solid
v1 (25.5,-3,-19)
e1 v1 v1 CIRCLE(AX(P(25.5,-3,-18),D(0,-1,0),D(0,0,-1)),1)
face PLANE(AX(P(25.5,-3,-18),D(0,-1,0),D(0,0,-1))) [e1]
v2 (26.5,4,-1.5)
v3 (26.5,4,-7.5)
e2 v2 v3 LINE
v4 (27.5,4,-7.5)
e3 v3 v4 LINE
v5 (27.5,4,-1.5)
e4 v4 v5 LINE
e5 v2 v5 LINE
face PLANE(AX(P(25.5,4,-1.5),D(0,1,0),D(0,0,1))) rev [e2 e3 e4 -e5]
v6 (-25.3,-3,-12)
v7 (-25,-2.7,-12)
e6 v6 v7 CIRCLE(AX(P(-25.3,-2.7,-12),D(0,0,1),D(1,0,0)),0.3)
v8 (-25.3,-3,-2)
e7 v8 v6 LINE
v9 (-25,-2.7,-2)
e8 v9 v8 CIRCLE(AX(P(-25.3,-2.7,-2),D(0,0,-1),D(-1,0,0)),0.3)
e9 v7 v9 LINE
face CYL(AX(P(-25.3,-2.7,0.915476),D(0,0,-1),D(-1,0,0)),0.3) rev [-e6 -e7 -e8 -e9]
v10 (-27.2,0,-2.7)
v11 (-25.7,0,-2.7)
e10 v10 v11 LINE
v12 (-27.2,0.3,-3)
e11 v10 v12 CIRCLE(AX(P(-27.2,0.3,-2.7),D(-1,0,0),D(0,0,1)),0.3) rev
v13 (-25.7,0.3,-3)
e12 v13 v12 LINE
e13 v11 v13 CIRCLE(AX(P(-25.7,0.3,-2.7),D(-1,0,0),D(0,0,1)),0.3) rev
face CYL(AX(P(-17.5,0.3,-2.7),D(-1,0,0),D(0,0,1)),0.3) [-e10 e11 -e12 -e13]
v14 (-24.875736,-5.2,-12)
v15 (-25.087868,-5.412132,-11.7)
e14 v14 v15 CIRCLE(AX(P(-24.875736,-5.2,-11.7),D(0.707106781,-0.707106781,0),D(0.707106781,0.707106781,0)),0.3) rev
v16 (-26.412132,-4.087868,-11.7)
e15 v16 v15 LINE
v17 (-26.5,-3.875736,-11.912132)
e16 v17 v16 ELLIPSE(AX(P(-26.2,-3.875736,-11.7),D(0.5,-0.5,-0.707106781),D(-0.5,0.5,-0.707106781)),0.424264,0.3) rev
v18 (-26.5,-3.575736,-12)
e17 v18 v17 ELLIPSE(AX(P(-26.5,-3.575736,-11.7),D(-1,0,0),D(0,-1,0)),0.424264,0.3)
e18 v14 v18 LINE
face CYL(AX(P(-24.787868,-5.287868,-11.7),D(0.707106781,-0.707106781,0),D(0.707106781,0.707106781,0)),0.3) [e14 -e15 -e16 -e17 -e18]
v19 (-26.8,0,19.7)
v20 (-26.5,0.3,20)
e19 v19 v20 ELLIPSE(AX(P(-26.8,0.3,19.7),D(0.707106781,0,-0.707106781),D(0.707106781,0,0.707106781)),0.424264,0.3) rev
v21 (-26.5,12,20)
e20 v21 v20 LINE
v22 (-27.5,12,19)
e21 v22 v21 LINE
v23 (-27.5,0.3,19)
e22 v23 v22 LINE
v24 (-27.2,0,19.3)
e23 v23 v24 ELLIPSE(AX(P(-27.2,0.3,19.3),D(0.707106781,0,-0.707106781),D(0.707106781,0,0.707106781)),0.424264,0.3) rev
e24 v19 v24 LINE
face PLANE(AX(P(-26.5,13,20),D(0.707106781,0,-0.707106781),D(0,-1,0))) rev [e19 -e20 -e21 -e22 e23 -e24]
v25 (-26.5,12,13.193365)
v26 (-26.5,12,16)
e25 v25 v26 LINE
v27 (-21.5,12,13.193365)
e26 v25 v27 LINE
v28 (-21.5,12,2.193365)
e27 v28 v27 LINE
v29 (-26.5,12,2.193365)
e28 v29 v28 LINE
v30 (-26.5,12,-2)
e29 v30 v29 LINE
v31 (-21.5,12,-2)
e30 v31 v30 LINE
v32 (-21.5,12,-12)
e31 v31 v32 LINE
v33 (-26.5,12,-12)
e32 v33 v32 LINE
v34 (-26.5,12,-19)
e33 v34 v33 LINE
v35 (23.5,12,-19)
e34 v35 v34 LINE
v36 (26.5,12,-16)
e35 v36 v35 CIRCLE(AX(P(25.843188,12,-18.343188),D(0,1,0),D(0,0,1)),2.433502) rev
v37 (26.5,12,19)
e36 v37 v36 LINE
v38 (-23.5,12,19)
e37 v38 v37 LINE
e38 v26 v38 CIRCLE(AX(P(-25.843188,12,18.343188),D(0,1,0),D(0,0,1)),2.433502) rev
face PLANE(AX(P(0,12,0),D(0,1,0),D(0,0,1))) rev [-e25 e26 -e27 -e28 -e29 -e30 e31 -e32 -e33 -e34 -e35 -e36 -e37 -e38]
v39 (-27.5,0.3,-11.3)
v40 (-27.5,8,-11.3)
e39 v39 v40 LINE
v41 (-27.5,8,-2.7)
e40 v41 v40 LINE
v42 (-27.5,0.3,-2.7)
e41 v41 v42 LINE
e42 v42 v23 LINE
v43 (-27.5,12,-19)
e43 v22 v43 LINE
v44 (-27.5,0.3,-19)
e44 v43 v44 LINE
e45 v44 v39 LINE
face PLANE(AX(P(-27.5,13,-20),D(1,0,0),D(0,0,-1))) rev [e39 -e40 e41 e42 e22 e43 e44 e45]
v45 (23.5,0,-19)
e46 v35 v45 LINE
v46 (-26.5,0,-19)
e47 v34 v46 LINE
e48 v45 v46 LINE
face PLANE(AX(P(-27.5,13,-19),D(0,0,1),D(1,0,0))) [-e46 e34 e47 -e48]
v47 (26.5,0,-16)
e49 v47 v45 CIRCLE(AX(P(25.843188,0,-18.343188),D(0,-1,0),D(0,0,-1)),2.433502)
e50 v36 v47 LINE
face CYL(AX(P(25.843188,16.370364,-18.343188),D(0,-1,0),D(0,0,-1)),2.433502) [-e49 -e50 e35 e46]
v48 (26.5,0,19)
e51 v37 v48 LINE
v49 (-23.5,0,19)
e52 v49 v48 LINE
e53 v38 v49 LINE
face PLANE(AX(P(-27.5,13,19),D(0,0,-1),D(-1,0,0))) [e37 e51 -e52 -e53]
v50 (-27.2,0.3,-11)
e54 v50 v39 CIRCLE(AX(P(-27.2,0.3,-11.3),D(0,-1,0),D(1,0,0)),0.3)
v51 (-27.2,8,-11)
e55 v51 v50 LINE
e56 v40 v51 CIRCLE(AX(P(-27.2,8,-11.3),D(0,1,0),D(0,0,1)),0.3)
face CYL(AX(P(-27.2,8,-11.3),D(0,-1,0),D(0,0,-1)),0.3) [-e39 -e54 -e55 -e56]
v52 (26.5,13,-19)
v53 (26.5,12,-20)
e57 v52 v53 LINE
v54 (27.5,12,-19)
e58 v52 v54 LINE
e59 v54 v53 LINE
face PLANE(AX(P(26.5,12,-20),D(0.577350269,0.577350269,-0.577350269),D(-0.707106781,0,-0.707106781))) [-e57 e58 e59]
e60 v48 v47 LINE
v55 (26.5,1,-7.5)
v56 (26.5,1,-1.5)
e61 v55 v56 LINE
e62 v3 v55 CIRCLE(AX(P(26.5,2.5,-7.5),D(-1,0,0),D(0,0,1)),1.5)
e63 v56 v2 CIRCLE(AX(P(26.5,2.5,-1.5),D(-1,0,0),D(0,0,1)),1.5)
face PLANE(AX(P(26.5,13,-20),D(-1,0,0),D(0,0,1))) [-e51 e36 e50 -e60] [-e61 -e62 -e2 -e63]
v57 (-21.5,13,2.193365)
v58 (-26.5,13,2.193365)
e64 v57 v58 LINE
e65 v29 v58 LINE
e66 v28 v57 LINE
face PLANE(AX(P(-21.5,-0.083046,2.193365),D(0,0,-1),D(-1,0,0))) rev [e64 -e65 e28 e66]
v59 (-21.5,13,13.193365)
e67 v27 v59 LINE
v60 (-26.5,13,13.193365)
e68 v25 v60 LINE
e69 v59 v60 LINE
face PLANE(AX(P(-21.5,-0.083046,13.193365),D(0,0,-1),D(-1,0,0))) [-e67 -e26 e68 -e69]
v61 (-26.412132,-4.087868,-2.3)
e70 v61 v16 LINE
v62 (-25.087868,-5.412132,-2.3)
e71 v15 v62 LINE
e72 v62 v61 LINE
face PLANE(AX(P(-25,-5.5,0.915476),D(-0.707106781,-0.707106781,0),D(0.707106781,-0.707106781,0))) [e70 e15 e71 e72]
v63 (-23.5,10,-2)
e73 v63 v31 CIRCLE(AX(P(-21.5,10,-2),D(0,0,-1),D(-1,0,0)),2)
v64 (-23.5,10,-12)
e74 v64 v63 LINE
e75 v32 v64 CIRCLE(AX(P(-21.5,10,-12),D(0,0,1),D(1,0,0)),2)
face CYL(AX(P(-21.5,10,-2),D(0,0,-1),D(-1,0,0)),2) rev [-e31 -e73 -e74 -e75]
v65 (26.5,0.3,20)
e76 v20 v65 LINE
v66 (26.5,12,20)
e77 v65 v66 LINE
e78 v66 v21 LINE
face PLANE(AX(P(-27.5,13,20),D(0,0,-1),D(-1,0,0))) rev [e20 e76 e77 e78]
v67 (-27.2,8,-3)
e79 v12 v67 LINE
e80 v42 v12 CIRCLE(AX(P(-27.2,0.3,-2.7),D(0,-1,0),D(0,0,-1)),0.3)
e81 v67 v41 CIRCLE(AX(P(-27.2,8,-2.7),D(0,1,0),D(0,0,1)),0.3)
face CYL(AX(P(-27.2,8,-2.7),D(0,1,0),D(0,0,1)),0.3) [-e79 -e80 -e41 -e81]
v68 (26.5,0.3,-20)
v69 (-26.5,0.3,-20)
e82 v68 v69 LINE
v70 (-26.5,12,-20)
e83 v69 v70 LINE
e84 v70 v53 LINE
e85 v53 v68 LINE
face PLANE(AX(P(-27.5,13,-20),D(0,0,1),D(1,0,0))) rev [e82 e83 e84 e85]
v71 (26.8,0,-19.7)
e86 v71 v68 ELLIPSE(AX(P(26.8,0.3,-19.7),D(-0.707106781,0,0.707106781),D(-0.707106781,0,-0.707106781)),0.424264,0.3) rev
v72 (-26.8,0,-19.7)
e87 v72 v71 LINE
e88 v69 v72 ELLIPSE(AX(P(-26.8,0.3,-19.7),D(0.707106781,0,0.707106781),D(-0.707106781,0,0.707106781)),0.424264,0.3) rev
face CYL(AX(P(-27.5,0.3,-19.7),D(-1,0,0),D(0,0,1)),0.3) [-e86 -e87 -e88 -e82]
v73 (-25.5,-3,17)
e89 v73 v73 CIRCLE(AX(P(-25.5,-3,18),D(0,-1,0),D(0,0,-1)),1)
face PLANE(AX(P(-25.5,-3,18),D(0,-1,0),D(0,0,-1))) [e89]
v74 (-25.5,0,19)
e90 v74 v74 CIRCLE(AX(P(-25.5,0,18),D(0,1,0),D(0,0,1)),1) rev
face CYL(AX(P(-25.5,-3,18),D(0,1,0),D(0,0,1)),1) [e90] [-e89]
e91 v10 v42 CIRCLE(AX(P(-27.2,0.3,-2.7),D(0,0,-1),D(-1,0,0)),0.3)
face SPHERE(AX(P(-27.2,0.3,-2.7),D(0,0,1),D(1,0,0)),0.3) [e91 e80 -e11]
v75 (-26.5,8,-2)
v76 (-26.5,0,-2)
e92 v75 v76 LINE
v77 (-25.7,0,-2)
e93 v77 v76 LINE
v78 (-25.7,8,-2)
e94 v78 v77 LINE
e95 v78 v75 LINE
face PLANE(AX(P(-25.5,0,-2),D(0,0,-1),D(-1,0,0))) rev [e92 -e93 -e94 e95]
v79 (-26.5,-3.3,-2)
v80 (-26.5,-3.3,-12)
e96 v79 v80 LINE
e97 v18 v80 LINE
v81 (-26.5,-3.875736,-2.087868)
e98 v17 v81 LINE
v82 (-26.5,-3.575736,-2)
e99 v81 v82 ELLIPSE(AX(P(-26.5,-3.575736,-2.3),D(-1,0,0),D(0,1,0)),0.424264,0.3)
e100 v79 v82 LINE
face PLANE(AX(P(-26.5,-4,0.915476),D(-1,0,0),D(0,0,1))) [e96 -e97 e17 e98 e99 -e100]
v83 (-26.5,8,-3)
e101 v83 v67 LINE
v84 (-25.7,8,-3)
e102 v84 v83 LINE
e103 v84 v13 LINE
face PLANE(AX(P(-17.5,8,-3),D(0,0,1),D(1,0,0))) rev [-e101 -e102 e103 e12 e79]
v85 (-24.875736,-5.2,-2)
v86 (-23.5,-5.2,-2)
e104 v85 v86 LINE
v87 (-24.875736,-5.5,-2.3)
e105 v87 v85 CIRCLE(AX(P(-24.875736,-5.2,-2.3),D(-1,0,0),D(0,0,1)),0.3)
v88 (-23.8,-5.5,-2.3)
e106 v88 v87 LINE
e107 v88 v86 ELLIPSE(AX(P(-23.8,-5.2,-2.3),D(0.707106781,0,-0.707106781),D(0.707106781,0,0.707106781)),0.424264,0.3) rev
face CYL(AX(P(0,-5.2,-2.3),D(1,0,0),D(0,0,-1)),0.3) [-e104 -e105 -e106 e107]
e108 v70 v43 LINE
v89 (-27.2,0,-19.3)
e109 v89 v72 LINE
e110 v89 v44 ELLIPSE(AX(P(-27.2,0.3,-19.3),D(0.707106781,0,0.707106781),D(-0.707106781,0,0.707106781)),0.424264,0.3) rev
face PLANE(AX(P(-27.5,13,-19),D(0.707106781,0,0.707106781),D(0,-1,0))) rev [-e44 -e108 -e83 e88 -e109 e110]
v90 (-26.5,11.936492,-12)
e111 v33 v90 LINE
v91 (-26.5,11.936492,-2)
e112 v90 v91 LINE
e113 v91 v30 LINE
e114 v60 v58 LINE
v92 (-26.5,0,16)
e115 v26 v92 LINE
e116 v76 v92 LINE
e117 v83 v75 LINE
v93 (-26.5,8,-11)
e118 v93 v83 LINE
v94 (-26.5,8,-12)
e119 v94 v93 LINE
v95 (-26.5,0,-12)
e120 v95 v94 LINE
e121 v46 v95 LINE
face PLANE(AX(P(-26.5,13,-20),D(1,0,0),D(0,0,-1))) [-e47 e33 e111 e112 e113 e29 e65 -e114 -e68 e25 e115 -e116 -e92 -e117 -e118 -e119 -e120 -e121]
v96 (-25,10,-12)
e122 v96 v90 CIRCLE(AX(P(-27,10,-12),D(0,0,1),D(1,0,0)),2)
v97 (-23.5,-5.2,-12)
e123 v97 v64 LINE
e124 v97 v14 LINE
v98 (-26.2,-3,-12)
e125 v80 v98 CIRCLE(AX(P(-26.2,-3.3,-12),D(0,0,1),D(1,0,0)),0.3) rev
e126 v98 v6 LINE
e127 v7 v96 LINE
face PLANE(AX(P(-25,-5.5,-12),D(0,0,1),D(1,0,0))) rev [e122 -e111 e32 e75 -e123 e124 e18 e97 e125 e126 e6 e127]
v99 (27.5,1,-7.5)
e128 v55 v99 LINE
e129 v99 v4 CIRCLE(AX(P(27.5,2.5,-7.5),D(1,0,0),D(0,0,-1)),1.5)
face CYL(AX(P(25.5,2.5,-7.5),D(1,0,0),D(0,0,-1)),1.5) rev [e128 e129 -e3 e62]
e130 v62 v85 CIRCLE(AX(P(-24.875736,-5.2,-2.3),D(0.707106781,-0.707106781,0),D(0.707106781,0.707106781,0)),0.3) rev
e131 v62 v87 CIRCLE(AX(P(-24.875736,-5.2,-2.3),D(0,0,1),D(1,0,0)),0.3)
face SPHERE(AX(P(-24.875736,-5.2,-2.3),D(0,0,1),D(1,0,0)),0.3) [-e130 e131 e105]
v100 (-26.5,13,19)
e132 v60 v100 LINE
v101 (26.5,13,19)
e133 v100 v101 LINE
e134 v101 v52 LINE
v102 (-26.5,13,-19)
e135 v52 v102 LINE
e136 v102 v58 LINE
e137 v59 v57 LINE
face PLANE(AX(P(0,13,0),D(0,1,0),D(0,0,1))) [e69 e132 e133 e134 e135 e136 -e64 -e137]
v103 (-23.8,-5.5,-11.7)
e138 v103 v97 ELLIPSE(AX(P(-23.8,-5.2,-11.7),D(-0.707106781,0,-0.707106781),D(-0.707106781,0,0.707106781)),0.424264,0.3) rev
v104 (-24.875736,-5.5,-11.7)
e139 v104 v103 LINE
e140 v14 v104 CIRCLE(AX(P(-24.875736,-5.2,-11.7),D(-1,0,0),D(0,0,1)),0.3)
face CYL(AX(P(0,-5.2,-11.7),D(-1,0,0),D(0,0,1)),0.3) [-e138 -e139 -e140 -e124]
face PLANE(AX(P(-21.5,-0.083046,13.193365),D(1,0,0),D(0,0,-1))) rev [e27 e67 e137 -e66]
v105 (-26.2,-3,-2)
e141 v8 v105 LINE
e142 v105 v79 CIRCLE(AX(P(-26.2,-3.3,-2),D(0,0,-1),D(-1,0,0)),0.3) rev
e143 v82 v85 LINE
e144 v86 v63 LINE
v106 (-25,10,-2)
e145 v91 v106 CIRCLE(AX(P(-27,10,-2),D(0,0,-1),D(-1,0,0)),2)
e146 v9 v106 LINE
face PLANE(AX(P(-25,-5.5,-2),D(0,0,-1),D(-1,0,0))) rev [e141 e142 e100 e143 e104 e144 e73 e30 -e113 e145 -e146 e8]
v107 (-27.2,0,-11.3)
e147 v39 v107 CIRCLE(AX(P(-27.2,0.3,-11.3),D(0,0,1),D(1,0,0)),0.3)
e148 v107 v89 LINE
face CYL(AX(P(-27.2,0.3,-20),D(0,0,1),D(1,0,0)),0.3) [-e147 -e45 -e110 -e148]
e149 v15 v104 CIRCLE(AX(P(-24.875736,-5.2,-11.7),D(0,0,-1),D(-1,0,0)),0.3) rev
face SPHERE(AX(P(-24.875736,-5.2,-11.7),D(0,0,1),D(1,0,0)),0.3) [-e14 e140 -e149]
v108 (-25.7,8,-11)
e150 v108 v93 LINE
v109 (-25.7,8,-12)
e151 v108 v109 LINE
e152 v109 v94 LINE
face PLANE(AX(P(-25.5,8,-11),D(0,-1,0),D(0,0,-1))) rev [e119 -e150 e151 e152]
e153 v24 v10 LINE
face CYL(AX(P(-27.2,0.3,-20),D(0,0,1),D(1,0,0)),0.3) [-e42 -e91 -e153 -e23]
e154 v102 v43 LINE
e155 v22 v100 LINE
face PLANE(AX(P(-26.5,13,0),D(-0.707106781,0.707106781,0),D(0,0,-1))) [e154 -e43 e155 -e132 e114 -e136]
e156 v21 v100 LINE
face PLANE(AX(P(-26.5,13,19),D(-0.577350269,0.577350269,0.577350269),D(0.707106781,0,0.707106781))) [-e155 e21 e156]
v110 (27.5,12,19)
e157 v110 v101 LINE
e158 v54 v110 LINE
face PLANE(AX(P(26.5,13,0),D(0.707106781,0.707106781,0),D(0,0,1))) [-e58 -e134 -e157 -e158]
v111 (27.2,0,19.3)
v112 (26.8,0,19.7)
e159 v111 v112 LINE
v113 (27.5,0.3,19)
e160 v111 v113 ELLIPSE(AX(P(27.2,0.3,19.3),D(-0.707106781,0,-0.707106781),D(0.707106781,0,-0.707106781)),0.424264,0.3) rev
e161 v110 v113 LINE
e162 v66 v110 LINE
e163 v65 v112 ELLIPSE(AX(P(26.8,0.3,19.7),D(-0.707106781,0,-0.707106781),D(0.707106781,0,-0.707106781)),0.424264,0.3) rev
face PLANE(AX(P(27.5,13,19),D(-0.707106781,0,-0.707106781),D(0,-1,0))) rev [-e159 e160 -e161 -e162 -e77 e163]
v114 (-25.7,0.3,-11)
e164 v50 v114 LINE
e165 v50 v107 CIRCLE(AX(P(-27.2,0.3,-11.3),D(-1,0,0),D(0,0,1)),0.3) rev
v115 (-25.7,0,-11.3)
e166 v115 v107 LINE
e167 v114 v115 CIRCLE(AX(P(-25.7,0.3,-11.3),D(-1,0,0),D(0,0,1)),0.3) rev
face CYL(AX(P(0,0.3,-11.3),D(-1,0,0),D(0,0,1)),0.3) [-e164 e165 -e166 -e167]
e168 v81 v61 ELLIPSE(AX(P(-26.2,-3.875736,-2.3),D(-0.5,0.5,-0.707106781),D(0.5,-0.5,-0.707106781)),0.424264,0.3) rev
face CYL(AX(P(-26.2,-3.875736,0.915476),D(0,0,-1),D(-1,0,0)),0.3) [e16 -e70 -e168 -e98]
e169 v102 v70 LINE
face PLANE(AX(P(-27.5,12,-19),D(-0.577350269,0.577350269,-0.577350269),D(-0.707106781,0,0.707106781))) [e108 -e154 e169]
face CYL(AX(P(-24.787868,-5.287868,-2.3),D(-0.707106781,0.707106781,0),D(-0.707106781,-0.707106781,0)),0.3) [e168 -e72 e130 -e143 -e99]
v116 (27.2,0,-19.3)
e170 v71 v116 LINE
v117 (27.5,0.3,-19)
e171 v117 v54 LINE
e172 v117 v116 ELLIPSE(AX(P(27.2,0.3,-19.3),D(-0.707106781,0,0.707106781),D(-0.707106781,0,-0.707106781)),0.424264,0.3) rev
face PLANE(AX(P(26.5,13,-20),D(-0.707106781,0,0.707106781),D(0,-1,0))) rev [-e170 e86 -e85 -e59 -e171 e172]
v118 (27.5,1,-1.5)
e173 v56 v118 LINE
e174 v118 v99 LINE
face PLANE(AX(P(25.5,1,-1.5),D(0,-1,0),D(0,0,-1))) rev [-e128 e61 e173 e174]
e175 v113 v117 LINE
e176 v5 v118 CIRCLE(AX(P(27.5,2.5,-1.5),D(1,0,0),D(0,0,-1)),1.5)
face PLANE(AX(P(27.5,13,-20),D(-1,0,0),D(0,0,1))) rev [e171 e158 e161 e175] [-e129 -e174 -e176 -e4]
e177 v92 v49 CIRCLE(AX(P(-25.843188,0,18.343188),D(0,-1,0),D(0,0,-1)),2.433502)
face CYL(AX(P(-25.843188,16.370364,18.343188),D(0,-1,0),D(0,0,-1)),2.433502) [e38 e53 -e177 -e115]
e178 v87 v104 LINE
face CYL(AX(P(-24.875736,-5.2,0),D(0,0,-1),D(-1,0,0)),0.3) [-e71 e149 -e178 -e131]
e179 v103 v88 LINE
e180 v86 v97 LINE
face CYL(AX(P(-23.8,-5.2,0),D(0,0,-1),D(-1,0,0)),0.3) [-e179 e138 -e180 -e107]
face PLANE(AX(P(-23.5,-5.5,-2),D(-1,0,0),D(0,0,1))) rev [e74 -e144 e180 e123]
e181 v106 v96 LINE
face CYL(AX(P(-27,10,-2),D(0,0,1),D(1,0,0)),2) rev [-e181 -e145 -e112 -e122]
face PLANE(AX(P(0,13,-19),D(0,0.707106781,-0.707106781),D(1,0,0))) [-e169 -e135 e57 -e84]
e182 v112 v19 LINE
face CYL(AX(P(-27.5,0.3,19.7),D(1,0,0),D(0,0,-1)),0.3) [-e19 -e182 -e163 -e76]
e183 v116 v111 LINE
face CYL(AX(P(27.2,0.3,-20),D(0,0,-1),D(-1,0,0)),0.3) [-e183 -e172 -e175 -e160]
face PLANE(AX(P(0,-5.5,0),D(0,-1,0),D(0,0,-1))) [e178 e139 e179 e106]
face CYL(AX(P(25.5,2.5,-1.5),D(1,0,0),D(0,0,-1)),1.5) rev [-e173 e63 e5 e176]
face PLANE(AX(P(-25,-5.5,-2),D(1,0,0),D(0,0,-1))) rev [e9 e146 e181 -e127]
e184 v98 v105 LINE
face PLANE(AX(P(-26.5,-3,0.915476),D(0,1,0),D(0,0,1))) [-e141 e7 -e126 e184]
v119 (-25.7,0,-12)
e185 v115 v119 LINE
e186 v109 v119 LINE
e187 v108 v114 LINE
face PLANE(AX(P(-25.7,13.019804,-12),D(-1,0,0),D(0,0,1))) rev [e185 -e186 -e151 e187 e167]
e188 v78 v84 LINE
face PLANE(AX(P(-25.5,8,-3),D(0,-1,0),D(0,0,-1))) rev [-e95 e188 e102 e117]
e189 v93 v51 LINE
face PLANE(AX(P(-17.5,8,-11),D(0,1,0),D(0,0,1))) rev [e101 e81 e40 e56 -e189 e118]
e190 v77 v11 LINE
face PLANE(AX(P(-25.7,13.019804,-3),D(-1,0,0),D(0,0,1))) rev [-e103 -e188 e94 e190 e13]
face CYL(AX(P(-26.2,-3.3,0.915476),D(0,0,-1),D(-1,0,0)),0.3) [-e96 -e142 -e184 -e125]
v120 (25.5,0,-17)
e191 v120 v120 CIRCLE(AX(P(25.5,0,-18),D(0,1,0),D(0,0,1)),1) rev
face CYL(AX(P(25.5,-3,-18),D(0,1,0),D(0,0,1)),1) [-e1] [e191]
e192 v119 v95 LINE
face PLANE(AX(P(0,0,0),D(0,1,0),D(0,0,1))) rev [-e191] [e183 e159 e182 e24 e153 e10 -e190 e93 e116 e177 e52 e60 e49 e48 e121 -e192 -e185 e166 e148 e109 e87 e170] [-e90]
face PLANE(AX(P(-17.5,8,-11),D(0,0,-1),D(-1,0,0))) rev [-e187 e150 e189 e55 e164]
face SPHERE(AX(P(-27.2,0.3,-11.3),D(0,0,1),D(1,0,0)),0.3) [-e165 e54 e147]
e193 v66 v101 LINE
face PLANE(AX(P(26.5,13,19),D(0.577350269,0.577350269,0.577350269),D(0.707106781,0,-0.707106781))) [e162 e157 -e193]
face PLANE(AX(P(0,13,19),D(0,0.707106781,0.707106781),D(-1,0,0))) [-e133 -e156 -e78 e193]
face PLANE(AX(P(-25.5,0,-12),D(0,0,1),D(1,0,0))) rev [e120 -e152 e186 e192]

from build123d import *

# Parameters (mm, degrees)
SKETCH_1_W          = 55
SKETCH_1_H          = 40
EXTRUDE_1_DEPTH     = 13
SHELL_1_T           = -1
CHAMFER_1_SIZE      = 1
CUT_EXTRUDE_3_DEPTH = 2
EXTRUDE_5_DEPTH     = 12
SKETCH_16_W         = 5
SKETCH_16_H         = 11
CUT_EXTRUDE_4_DEPTH = 1
SKETCH_18_W         = 8
SKETCH_18_H         = 8
CUT_EXTRUDE_5_DEPTH = 10
SKETCH_19_W         = 1
SKETCH_19_H         = 8
EXTRUDE_6_DEPTH     = 1
SKETCH_21_W         = 0.2
SKETCH_21_H         = 1
CUT_EXTRUDE_6_DEPTH = 12
SKETCH_20_W         = 1.5
SKETCH_20_H         = 10
EXTRUDE_8_DEPTH     = 17.5
EXTRUDE_9_DEPTH     = 10
SKETCH_7_R          = 1
EXTRUDE_4_DEPTH     = 3
FILLET_1_R          = 2
FILLET_2_R          = 0.3
FILLET_3_R          = 0.3


with BuildPart() as part:
    # 草图1 → 凸台-拉伸1 (new body)
    with BuildSketch(Plane(origin=(0, 0, 0), x_dir=(1, 0, 0), z_dir=(0, 1, 0))):
        Rectangle(SKETCH_1_W, SKETCH_1_H)
    extrude(amount=EXTRUDE_1_DEPTH)

    # 抽壳1
    shell_1_openings = [part.faces().sort_by_distance(p)[0] for p in [
        (0, 0, 0),
    ]]
    offset(amount=SHELL_1_T, openings=shell_1_openings, kind=Kind.INTERSECTION)

    # 倒角1
    chamfer_1_edges = [part.edges().sort_by_distance(p)[0] for p in [
        (27.5, 13, 0),
        (0, 13, -20),
        (-27.5, 13, 0),
        (0, 13, 20),
        (-27.5, 6.5, -20),
        (27.5, 6.5, -20),
        (27.5, 6.5, 20),
        (-27.5, 6.5, 20),
    ]]
    chamfer(chamfer_1_edges, length=CHAMFER_1_SIZE)

    # 草图4 → 切除-拉伸3 (cut)
    with BuildSketch(Plane(origin=(27.5, 0, 0), x_dir=(0, 0, -1), z_dir=(1, 0, 0))):
        with BuildLine():
            Line((1.5, 4), (7.5, 4))
            ThreePointArc((7.5, 4), (9, 2.5), (7.5, 1))
            Line((7.5, 1), (1.5, 1))
            ThreePointArc((1.5, 1), (0, 2.5), (1.5, 4))
        make_face()
    extrude(amount=-CUT_EXTRUDE_3_DEPTH, mode=Mode.SUBTRACT)

    # 草图12 → 凸台-拉伸5 (add)
    with BuildSketch(Plane.XZ):
        with BuildLine():
            Line((26.5, -19), (23.5, -19))
            ThreePointArc((23.5, -19), (24.12244212, -16.62244212), (26.5, -16))
            Line((26.5, -16), (26.5, -19))
        make_face()
        with BuildLine():
            Line((-26.5, 19), (-23.5, 19))
            ThreePointArc((-23.5, 19), (-24.12244212, 16.62244212), (-26.5, 16))
            Line((-26.5, 16), (-26.5, 19))
        make_face()
    extrude(amount=-EXTRUDE_5_DEPTH)

    # 草图16 → 切除-拉伸4 (cut)
    with BuildSketch(Plane(origin=(0, 13, 0), x_dir=(1, 0, 0), z_dir=(0, 1, 0))):
        with Locations((-24, -7.69336468)):
            Rectangle(SKETCH_16_W, SKETCH_16_H)
    extrude(amount=-CUT_EXTRUDE_4_DEPTH, mode=Mode.SUBTRACT)

    # 草图18 → 切除-拉伸5 (cut)
    with BuildSketch(Plane.ZY.offset(27.5)):
        with Locations((-7, 4)):
            Rectangle(SKETCH_18_W, SKETCH_18_H)
    extrude(amount=-CUT_EXTRUDE_5_DEPTH, mode=Mode.SUBTRACT)

    # 草图19 → 凸台-拉伸6 (add)
    with BuildSketch(Plane(origin=(-26.5, 0, 0), x_dir=(0, 0, -1), z_dir=(1, 0, 0))):
        with Locations((2.5, 4)):
            Rectangle(SKETCH_19_W, SKETCH_19_H)
        with Locations((11.5, 4)):
            Rectangle(SKETCH_19_W, SKETCH_19_H)
    extrude(amount=EXTRUDE_6_DEPTH)

    # 草图21 → 切除-拉伸6 (cut)
    with BuildSketch(Plane.XZ):
        with Locations((-25.6, -11.5)):
            Rectangle(SKETCH_21_W, SKETCH_21_H)
        with Locations((-25.6, -2.5)):
            Rectangle(SKETCH_21_W, SKETCH_21_H)
    extrude(amount=-CUT_EXTRUDE_6_DEPTH, mode=Mode.SUBTRACT)

    # 草图20 → 凸台-拉伸8 (add)
    with BuildSketch(Plane.XZ.offset(-12)):
        with Locations((-24.25, -7)):
            Rectangle(SKETCH_20_W, SKETCH_20_H)
    extrude(amount=EXTRUDE_8_DEPTH)

    # 草图22 → 凸台-拉伸9 (add)
    with BuildSketch(Plane(origin=(0, 0, -12), x_dir=(-1, 0, 0), z_dir=(0, 0, -1))):
        Polygon((25, -5.5), (26.5, -4), (26.5, -3), (25, -3), align=None)
    extrude(amount=-EXTRUDE_9_DEPTH)

    # 草图7 → 凸台-拉伸4 (add)
    with BuildSketch(Plane.XZ):
        with Locations(Location((-25.5, 18, 0), (0, 0, 90))):
            Circle(SKETCH_7_R)
        with Locations(Location((25.5, -18, 0), (0, 0, 90))):
            Circle(SKETCH_7_R)
    extrude(amount=EXTRUDE_4_DEPTH)

    # 圆角1
    # the kernel refuses this fillet: 2 mm, written as the material it adds along each edge
    with BuildSketch(Plane(origin=(-25, 12, -12), x_dir=(-1, 0, 0), z_dir=(0, 0, 1)), Plane(origin=(-23.5, 12, -2), x_dir=(1, 0, 0), z_dir=(0, 0, -1))) as fillet_1_piece_1:
        with BuildLine():
            CenterArc((FILLET_1_R, FILLET_1_R), FILLET_1_R, 180, 90)
            Line((0, FILLET_1_R), (0, 0))
            Line((0, 0), (FILLET_1_R, 0))
        make_face()
    extrude(amount=10)

    # 圆角2
    fillet_2_edges = [part.edges().sort_by_distance(p)[0] for p in [
        (-25, -5.5, -7),
        (-24.25, -5.5, -12),
        (-23.5, -5.5, -7),
        (-24.25, -5.5, -2),
        (-25, -3, -7),
        (-26.5, -3, -7),
        (-26.5, -4, -7),
        (-25.75, -4.75, -12),
        (-25.75, -4.75, -2),
    ]]
    fillet(fillet_2_edges, radius=FILLET_2_R)

    # 圆角3
    fillet_3_edges = [part.edges().sort_by_distance(p)[0] for p in [
        (-27.5, 0, 8),
        (-27.5, 4, -11),
        (-27.5, 4, -3),
        (-26.6, 0, -3),
        (-26.6, 0, -11),
        (-27.5, 0, -15),
        (0, 0, -20),
        (27.5, 0, 0),
        (0, 0, 20),
    ]]
    fillet(fillet_3_edges, radius=FILLET_3_R)


solid = part.part
